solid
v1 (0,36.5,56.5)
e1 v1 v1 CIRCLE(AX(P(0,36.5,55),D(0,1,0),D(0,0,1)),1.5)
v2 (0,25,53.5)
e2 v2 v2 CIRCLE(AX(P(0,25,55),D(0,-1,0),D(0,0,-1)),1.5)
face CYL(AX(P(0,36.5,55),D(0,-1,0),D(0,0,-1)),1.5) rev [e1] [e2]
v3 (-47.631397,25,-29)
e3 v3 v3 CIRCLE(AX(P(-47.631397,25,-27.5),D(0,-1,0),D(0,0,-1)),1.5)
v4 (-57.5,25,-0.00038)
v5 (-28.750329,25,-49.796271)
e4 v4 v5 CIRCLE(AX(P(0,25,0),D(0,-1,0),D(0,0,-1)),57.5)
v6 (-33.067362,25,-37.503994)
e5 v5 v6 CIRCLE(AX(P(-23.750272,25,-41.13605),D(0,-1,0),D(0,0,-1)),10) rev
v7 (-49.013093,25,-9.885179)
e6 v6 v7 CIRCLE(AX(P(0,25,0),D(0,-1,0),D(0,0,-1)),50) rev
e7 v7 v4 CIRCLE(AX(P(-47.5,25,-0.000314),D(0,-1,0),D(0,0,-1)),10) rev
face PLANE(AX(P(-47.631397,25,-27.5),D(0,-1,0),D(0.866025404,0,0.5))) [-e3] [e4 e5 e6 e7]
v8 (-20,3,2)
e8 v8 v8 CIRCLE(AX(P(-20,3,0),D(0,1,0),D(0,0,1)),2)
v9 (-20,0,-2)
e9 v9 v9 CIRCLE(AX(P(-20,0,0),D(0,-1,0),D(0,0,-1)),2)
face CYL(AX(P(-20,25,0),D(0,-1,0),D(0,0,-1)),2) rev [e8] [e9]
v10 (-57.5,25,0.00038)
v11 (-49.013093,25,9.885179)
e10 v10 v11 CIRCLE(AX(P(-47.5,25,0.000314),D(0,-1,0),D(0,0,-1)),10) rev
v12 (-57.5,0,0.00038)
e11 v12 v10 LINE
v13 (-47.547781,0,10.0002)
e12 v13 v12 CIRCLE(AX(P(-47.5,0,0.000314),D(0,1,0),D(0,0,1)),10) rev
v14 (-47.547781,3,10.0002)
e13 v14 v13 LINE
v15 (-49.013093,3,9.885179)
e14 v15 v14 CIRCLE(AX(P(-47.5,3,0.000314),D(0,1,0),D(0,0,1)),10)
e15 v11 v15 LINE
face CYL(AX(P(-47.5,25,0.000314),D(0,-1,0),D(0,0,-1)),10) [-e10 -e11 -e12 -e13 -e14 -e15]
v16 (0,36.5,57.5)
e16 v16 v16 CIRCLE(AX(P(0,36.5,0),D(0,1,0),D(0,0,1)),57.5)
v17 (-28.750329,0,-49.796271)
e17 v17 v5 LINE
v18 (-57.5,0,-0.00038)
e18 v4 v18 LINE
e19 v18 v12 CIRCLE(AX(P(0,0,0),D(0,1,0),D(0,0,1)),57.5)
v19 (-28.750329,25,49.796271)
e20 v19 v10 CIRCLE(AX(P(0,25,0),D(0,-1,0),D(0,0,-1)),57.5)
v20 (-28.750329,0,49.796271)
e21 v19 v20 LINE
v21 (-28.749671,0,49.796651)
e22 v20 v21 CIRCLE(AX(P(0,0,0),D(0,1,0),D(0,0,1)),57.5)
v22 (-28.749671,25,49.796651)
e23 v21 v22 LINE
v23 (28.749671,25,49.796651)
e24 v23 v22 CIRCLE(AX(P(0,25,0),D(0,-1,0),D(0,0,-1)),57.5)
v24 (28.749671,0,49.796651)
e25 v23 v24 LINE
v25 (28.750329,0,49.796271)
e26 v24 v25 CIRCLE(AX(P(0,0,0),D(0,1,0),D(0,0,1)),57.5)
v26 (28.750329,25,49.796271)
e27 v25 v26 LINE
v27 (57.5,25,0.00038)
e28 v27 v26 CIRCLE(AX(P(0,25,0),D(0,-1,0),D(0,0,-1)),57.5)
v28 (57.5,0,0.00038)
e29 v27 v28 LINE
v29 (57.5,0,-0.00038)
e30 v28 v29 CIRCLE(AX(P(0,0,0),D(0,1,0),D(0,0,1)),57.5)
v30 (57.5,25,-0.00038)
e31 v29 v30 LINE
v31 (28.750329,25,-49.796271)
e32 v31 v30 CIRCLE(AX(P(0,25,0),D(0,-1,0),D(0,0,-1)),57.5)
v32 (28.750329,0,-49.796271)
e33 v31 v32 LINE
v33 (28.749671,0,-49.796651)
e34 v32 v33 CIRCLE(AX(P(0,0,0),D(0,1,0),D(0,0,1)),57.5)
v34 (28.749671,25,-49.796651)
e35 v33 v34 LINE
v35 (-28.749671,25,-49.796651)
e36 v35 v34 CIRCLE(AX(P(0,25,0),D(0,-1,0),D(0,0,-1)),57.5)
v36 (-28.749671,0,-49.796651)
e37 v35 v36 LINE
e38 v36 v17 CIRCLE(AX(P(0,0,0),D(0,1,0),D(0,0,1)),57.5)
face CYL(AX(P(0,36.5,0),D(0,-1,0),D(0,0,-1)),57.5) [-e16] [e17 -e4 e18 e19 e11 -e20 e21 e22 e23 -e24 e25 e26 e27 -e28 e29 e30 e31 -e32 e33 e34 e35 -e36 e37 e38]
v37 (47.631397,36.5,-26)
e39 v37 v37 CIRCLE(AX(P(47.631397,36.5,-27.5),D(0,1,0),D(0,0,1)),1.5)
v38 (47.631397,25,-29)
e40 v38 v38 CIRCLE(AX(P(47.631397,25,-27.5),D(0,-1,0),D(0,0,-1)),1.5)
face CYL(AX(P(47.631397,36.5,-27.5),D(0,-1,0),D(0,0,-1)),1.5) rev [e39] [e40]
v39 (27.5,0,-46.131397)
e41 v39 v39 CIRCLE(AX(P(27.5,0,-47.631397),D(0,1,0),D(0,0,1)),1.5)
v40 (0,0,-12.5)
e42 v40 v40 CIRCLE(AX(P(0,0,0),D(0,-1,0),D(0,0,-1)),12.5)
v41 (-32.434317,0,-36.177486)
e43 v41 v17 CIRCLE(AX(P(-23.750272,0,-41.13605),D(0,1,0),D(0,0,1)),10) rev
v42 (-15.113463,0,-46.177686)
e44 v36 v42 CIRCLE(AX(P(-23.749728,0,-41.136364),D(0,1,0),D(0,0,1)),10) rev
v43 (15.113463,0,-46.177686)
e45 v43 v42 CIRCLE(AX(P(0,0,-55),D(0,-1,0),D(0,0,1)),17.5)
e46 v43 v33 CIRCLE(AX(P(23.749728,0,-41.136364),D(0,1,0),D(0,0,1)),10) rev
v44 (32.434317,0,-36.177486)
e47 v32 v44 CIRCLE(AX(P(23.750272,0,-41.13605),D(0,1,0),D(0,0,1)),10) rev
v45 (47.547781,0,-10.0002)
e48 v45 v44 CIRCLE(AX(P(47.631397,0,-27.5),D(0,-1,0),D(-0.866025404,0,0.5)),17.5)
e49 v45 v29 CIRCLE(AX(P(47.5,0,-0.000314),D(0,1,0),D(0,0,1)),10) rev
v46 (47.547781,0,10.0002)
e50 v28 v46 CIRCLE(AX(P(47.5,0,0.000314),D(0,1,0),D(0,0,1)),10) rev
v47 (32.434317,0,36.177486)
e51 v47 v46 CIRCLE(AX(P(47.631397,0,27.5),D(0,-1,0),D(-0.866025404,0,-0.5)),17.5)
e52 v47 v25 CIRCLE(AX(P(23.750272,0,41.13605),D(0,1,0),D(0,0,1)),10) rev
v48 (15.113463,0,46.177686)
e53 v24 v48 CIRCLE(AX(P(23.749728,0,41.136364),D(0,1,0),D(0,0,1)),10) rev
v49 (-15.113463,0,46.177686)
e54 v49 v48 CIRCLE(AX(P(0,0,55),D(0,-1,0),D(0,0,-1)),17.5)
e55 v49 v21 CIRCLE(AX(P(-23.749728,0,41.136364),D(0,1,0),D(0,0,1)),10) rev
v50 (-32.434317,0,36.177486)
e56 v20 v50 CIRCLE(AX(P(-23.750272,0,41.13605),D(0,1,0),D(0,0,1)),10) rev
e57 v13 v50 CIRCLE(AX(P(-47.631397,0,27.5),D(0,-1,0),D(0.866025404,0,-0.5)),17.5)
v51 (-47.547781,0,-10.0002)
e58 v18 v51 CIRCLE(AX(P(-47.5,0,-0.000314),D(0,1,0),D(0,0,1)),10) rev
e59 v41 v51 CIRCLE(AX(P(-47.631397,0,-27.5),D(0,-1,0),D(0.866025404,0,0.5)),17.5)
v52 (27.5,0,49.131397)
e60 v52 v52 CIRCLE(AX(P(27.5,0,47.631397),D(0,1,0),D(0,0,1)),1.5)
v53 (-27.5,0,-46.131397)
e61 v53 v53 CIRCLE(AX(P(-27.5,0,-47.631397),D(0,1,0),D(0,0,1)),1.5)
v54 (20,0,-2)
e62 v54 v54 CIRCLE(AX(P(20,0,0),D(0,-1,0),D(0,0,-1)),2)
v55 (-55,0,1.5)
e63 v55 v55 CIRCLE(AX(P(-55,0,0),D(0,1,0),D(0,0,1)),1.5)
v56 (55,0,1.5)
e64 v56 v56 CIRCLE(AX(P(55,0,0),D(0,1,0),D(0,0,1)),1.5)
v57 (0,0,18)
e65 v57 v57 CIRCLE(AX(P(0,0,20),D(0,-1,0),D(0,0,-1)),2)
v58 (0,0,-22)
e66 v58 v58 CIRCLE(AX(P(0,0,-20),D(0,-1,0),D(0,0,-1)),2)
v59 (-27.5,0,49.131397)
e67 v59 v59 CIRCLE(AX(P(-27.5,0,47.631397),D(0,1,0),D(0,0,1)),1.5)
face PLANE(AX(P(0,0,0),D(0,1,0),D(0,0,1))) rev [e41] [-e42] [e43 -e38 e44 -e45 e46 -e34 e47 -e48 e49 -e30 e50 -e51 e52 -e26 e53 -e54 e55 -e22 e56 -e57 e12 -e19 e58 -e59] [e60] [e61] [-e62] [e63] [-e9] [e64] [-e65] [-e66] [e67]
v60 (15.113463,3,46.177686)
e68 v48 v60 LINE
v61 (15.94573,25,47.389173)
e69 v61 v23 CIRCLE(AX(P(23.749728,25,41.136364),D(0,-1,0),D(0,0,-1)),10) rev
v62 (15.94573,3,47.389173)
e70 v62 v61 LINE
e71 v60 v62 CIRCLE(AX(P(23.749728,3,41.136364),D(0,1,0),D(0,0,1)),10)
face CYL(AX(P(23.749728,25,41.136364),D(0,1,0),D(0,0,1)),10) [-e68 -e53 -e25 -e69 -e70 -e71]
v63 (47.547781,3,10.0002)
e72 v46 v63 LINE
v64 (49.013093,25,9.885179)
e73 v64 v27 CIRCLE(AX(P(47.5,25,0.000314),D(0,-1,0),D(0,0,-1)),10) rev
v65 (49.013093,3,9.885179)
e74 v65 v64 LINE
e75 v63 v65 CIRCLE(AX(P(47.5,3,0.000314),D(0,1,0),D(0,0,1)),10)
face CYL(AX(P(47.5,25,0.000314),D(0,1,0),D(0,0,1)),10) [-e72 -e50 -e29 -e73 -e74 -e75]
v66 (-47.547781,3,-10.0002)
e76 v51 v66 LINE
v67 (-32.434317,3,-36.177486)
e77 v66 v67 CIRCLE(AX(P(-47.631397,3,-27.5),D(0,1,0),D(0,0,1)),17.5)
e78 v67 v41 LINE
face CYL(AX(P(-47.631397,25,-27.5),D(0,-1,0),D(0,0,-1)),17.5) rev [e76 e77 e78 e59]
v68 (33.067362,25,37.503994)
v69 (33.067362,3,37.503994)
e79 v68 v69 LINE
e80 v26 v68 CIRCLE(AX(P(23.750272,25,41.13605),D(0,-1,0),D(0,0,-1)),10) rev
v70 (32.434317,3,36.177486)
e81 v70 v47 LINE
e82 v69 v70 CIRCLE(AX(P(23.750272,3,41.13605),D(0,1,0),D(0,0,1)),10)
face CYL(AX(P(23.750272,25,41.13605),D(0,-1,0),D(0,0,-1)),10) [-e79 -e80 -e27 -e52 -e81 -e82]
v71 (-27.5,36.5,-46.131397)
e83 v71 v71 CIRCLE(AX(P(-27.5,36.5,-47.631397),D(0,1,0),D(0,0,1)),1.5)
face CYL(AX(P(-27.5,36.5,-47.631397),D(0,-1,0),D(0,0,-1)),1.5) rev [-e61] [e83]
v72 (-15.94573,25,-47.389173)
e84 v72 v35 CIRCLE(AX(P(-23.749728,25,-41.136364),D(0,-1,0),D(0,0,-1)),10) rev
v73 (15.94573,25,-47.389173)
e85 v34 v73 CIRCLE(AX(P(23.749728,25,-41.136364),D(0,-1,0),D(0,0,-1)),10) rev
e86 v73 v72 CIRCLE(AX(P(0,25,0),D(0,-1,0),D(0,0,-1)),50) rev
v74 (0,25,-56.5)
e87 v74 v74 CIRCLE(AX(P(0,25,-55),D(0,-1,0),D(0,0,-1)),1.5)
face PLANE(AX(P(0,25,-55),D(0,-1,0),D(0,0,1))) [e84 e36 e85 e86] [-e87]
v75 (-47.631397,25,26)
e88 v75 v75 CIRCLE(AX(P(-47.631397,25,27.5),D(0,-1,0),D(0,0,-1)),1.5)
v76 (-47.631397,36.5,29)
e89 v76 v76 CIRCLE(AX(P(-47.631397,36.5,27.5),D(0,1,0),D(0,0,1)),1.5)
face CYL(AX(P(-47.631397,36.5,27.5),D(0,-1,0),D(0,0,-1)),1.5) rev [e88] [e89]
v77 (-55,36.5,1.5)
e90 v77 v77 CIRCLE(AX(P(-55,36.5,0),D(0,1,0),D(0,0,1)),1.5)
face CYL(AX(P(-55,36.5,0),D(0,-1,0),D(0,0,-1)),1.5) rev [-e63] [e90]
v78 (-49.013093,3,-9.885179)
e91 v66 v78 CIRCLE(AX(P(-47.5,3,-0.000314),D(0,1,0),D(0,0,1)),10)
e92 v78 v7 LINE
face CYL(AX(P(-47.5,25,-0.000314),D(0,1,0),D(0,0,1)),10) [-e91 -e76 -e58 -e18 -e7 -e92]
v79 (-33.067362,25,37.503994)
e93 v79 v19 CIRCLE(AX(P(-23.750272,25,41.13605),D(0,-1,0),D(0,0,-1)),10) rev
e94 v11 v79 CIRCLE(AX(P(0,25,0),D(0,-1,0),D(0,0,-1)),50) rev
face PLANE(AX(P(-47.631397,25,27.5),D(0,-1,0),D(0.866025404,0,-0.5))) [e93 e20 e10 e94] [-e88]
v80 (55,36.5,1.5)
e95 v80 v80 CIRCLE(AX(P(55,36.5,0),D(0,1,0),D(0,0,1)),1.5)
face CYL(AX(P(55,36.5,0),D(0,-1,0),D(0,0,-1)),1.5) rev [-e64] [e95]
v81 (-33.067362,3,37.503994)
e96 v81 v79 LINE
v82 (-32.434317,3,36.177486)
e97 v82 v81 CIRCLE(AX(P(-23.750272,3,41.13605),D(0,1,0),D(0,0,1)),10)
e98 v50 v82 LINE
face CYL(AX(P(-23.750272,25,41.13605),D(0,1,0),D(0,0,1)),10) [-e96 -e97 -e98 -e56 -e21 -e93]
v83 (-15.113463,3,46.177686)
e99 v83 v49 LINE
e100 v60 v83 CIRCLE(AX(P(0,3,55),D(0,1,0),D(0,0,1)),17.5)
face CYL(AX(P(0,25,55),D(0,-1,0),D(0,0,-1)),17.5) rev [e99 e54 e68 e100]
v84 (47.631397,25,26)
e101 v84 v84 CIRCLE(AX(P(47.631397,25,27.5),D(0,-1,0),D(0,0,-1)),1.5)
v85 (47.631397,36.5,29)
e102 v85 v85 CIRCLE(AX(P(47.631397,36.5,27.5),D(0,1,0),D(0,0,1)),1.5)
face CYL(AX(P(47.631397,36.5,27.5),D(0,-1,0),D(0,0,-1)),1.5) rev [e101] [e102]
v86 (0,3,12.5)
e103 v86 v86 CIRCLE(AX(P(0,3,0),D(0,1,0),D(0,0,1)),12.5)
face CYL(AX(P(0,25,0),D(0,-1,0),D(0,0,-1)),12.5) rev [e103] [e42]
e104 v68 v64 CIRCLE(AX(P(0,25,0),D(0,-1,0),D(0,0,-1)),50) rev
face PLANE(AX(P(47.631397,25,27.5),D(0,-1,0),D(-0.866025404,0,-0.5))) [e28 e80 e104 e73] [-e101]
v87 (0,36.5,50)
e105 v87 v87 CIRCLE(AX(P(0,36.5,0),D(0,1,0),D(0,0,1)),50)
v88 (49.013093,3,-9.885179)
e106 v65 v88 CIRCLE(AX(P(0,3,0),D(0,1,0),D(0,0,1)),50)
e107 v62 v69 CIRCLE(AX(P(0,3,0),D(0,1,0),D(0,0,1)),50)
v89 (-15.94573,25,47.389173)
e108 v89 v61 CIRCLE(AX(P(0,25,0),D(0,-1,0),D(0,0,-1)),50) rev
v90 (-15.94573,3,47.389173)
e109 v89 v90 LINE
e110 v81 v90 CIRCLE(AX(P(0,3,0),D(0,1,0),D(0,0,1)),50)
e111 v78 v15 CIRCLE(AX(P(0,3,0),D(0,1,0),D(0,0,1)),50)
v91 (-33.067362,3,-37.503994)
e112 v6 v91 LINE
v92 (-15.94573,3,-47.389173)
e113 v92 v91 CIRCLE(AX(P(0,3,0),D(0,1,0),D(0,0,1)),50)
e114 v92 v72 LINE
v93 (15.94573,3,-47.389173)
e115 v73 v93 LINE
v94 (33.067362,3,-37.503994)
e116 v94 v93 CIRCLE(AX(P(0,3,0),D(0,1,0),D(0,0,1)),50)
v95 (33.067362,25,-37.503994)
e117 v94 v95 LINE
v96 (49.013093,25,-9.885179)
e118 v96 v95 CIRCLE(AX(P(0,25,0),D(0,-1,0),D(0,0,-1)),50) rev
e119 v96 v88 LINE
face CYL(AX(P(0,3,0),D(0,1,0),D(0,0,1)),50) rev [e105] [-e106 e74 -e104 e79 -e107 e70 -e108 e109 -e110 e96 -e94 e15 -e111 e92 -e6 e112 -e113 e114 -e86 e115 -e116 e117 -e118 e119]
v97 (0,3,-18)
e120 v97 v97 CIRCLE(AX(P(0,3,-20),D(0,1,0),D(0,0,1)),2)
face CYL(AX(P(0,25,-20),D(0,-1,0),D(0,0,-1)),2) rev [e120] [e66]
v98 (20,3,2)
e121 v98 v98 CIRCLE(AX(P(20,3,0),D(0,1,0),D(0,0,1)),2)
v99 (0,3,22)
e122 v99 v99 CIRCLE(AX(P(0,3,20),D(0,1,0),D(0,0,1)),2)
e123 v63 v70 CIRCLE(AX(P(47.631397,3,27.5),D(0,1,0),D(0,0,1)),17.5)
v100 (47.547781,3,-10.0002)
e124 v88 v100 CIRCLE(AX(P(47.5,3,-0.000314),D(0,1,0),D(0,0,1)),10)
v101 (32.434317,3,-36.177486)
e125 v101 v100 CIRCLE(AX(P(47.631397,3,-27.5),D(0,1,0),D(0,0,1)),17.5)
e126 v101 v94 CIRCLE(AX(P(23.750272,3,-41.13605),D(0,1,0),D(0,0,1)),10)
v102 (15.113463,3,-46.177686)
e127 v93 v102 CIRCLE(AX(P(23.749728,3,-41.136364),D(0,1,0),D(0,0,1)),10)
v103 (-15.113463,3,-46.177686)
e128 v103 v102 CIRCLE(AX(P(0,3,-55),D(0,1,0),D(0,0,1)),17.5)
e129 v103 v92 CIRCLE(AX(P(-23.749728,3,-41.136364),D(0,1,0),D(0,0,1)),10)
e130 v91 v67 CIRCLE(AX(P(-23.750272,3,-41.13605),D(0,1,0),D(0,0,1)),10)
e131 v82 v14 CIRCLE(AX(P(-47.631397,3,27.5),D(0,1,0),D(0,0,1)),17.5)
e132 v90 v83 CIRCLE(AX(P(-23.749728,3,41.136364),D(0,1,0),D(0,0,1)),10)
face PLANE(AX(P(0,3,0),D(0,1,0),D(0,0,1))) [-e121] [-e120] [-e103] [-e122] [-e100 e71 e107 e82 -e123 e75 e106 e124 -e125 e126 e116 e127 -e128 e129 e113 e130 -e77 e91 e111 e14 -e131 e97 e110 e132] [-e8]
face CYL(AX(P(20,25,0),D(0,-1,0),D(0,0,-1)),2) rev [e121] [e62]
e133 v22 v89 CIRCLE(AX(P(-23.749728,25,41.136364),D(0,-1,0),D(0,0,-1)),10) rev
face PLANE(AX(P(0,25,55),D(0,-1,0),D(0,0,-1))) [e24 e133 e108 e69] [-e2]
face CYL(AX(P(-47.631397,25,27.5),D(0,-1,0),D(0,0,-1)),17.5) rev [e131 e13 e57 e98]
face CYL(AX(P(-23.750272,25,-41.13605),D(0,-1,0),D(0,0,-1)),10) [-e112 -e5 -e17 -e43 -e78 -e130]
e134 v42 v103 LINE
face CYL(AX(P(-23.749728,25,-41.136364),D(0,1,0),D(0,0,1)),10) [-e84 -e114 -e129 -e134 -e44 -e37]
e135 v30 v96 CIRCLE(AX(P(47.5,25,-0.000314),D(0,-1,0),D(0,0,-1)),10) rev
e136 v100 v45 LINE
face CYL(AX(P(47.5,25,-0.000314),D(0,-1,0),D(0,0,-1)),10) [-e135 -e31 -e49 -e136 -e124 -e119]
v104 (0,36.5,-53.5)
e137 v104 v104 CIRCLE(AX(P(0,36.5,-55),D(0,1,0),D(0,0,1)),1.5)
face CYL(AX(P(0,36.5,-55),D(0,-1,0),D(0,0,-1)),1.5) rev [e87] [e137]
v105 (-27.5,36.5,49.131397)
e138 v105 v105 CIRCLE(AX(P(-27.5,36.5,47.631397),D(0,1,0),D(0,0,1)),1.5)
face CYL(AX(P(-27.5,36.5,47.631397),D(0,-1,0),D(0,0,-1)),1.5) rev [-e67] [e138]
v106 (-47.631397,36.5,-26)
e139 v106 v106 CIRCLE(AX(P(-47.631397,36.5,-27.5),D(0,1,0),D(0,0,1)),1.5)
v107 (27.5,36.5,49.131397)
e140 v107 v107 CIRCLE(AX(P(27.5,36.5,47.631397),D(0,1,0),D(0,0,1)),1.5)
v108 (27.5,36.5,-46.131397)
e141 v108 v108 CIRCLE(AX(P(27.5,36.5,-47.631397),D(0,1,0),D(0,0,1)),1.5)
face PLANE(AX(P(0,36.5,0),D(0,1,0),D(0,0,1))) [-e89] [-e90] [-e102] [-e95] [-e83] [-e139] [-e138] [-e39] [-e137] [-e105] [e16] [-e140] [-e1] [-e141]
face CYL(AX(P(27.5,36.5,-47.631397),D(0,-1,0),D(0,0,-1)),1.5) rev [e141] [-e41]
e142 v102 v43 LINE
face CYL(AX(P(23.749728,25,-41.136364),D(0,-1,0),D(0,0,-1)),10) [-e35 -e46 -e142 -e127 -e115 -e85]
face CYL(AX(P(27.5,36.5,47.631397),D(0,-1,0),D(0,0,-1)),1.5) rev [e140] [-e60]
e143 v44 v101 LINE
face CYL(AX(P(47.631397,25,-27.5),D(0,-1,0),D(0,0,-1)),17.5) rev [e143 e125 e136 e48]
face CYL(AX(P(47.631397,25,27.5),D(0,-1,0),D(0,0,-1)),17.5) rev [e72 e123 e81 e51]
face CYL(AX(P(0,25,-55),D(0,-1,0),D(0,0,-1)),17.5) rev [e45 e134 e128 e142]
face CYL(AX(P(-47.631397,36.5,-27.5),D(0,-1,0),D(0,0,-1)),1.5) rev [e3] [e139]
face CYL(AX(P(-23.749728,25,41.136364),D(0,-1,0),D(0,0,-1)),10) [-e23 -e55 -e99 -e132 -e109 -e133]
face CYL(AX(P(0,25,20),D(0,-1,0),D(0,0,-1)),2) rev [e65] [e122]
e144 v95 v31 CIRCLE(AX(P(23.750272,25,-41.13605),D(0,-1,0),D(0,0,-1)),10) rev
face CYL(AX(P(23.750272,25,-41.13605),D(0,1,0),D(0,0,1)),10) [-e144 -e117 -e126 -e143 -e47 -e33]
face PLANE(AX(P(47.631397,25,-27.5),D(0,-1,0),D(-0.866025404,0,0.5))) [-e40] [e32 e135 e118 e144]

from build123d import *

# Parameters (mm, degrees)
SKETCH1_R             = 57.5
SKETCH1_R_2           = 1.5
BOSS_EXTRUDE1_DEPTH   = 36.5
SKETCH2_R             = 50
CUT_EXTRUDE1_DEPTH    = 33.5
SKETCH3_R             = 17.5
CUT_EXTRUDE2_DEPTH    = 25
FILLET1_R             = 10
CIRPATTERN2_OUTLINE_R = 1.5
CIRPATTERN2_DEPTH     = 25
SKETCH5_R             = 2
SKETCH5_R_2           = 12.5
CUT_EXTRUDE3_DEPTH    = 25


# Read off the part's stored shape, not the designer's step: CirPattern2
with BuildPart() as part:
    # Sketch1 → Boss-Extrude1 (new body)
    with BuildSketch(Plane(origin=(0, 0, 0), x_dir=(1, 0, 0), z_dir=(0, 1, 0))):
        with Locations(Location((0, 0, 0), (0, 0, 270))):
            Circle(SKETCH1_R)
        with Locations(Location((55, 0, 0), (0, 0, 270))):
            Circle(SKETCH1_R_2, mode=Mode.SUBTRACT)
        with Locations(Location((47.631397208, -27.5, 0), (0, 0, 270))):
            Circle(SKETCH1_R_2, mode=Mode.SUBTRACT)
        with Locations(Location((27.5, -47.631397208, 0), (0, 0, 270))):
            Circle(SKETCH1_R_2, mode=Mode.SUBTRACT)
        with Locations(Location((0, -55, 0), (0, 0, 270))):
            Circle(SKETCH1_R_2, mode=Mode.SUBTRACT)
        with Locations(Location((-27.5, -47.631397208, 0), (0, 0, 270))):
            Circle(SKETCH1_R_2, mode=Mode.SUBTRACT)
        with Locations(Location((-47.631397208, -27.5, 0), (0, 0, 270))):
            Circle(SKETCH1_R_2, mode=Mode.SUBTRACT)
        with Locations(Location((-55, 0, 0), (0, 0, 270))):
            Circle(SKETCH1_R_2, mode=Mode.SUBTRACT)
        with Locations(Location((-47.631397208, 27.5, 0), (0, 0, 270))):
            Circle(SKETCH1_R_2, mode=Mode.SUBTRACT)
        with Locations(Location((-27.5, 47.631397208, 0), (0, 0, 270))):
            Circle(SKETCH1_R_2, mode=Mode.SUBTRACT)
        with Locations(Location((0, 55, 0), (0, 0, 270))):
            Circle(SKETCH1_R_2, mode=Mode.SUBTRACT)
        with Locations(Location((27.5, 47.631397208, 0), (0, 0, 270))):
            Circle(SKETCH1_R_2, mode=Mode.SUBTRACT)
        with Locations(Location((47.631397208, 27.5, 0), (0, 0, 270))):
            Circle(SKETCH1_R_2, mode=Mode.SUBTRACT)
    extrude(amount=BOSS_EXTRUDE1_DEPTH)

    # Sketch2 → Cut-Extrude1 (cut)
    with BuildSketch(Plane(origin=(0, 36.5, 0), x_dir=(1, 0, 0), z_dir=(0, 1, 0))):
        with Locations(Location((0, 0, 0), (0, 0, 270))):
            Circle(SKETCH2_R)
    extrude(amount=-CUT_EXTRUDE1_DEPTH, mode=Mode.SUBTRACT)

    # Sketch3 → Cut-Extrude2 (cut)
    with BuildSketch(Plane.XZ):
        with Locations((0, 55)):
            Circle(SKETCH3_R)
    extrude(amount=-CUT_EXTRUDE2_DEPTH, mode=Mode.SUBTRACT)

    # Fillet1
    # the kernel refuses this fillet: 10 mm, written as the material it takes off along each edge
    with BuildSketch(Plane(origin=(-17.498524141, 25, 54.772727273), x_dir=(-0.9145471310775286, 0, -0.4044793505704111), z_dir=(0, -1, 0))) as fillet1_piece_1:
        with BuildLine():
            CenterArc((11.232648192, 9.942614308), FILLET1_R, 186.415260194, 89.725856468)
            ThreePointArc((1.29526624, 8.825278217), (1.219357444, 4.328728415), (0, 0))
            ThreePointArc((0, 0), (6.151212105, -0.329967731), (12.30242421, 0))
        make_face()
    extrude(amount=55.756060526, mode=Mode.SUBTRACT)
    with BuildSketch(Plane(origin=(17.498524141, 25, 54.772727273), x_dir=(0.9145471310775289, 0, -0.4044793505704104), z_dir=(0, -1, 0))) as fillet1_piece_2:
        with BuildLine():
            CenterArc((11.232648192, -9.942614308), FILLET1_R, 83.858883338, 89.725856468)
            ThreePointArc((1.29526624, -8.825278217), (1.219357444, -4.328728415), (0, 0))
            ThreePointArc((0, 0), (6.151212105, 0.329967731), (12.30242421, 0))
        make_face()
    extrude(amount=55.756060526, mode=Mode.SUBTRACT)

    # CirPattern2 outline → CirPattern2 (cut)
    # profile 1 of 5: a face of its own
    with BuildSketch(Plane(origin=(0, 0, 0), x_dir=(1, 0, 0), z_dir=(0, 1, 0))):
        with BuildLine():
            ThreePointArc((-32.43431744, -36.177486186), (-32.475952642, -18.75), (-47.547780802, -10.000199764))
            ThreePointArc((-47.547780802, -10.000199764), (-54.587917435, -7.054491856), (-57.499999999, -0.000380002))
            ThreePointArc((-57.499999999, -0.000380002), (-49.796460718, -28.75), (-28.750329091, -49.796270715))
            ThreePointArc((-28.750329091, -49.796270715), (-33.403327875, -43.747277311), (-32.43431744, -36.177486186))
        make_face()
        with Locations((-47.631397208, -27.5)):
            Circle(CIRPATTERN2_OUTLINE_R, mode=Mode.SUBTRACT)
    # profile 2 of 5: a face of its own
    with BuildSketch(Plane(origin=(0, 0, 0), x_dir=(1, 0, 0), z_dir=(0, 1, 0))):
        with BuildLine():
            ThreePointArc((-32.43431744, 36.177486186), (-33.403327875, 43.747277311), (-28.750329091, 49.796270715))
            ThreePointArc((-28.750329091, 49.796270715), (-49.796460718, 28.75), (-57.499999999, 0.000380002))
            ThreePointArc((-57.499999999, 0.000380002), (-54.587917435, 7.054491856), (-47.547780802, 10.000199764))
            ThreePointArc((-47.547780802, 10.000199764), (-32.475952642, 18.75), (-32.43431744, 36.177486186))
        make_face()
        with Locations((-47.631397208, 27.5)):
            Circle(CIRPATTERN2_OUTLINE_R, mode=Mode.SUBTRACT)
    # profile 3 of 5: a face of its own
    with BuildSketch(Plane(origin=(0, 0, 0), x_dir=(1, 0, 0), z_dir=(0, 1, 0))):
        with BuildLine():
            ThreePointArc((57.499999999, -0.000380002), (54.587917435, -7.054491856), (47.547780802, -10.000199764))
            ThreePointArc((47.547780802, -10.000199764), (32.475952642, -18.75), (32.43431744, -36.177486186))
            ThreePointArc((32.43431744, -36.177486186), (33.403327875, -43.747277311), (28.750329091, -49.796270715))
            ThreePointArc((28.750329091, -49.796270715), (49.796460718, -28.75), (57.499999999, -0.000380002))
        make_face()
        with Locations((47.631397208, -27.5)):
            Circle(CIRPATTERN2_OUTLINE_R, mode=Mode.SUBTRACT)
    # profile 4 of 5: a face of its own
    with BuildSketch(Plane(origin=(0, 0, 0), x_dir=(1, 0, 0), z_dir=(0, 1, 0))):
        with BuildLine():
            ThreePointArc((15.113463363, 46.17768595), (21.18458956, 50.801769166), (28.749670908, 49.796650718))
            ThreePointArc((28.749670908, 49.796650718), (0, 57.5), (-28.749670908, 49.796650718))
            ThreePointArc((-28.749670908, 49.796650718), (-21.18458956, 50.801769166), (-15.113463363, 46.17768595))
            ThreePointArc((-15.113463363, 46.17768595), (0, 37.5), (15.113463363, 46.17768595))
        make_face()
        with Locations((0, 55)):
            Circle(CIRPATTERN2_OUTLINE_R, mode=Mode.SUBTRACT)
    # profile 5 of 5: a face of its own
    with BuildSketch(Plane(origin=(0, 0, 0), x_dir=(1, 0, 0), z_dir=(0, 1, 0))):
        with BuildLine():
            ThreePointArc((28.750329091, 49.796270715), (33.403327875, 43.747277311), (32.43431744, 36.177486186))
            ThreePointArc((32.43431744, 36.177486186), (32.475952642, 18.75), (47.547780802, 10.000199764))
            ThreePointArc((47.547780802, 10.000199764), (54.587917435, 7.054491856), (57.499999999, 0.000380002))
            ThreePointArc((57.499999999, 0.000380002), (49.796460718, 28.75), (28.750329091, 49.796270715))
        make_face()
        with Locations((47.631397208, 27.5)):
            Circle(CIRPATTERN2_OUTLINE_R, mode=Mode.SUBTRACT)
    extrude(amount=CIRPATTERN2_DEPTH, mode=Mode.SUBTRACT)

    # Sketch5 → Cut-Extrude3 (cut)
    with BuildSketch(Plane.XZ):
        with Locations(Location((0, 20, 0), (0, 0, 270))):
            Circle(SKETCH5_R)
        with Locations(Location((20, 0, 0), (0, 0, 270))):
            Circle(SKETCH5_R)
        with Locations(Location((0, -20, 0), (0, 0, 270))):
            Circle(SKETCH5_R)
        with Locations(Location((-20, 0, 0), (0, 0, 270))):
            Circle(SKETCH5_R)
        with Locations(Location((0, 0, 0), (0, 0, 270))):
            Circle(SKETCH5_R_2)
    extrude(amount=-CUT_EXTRUDE3_DEPTH, mode=Mode.SUBTRACT)


solid = part.part
